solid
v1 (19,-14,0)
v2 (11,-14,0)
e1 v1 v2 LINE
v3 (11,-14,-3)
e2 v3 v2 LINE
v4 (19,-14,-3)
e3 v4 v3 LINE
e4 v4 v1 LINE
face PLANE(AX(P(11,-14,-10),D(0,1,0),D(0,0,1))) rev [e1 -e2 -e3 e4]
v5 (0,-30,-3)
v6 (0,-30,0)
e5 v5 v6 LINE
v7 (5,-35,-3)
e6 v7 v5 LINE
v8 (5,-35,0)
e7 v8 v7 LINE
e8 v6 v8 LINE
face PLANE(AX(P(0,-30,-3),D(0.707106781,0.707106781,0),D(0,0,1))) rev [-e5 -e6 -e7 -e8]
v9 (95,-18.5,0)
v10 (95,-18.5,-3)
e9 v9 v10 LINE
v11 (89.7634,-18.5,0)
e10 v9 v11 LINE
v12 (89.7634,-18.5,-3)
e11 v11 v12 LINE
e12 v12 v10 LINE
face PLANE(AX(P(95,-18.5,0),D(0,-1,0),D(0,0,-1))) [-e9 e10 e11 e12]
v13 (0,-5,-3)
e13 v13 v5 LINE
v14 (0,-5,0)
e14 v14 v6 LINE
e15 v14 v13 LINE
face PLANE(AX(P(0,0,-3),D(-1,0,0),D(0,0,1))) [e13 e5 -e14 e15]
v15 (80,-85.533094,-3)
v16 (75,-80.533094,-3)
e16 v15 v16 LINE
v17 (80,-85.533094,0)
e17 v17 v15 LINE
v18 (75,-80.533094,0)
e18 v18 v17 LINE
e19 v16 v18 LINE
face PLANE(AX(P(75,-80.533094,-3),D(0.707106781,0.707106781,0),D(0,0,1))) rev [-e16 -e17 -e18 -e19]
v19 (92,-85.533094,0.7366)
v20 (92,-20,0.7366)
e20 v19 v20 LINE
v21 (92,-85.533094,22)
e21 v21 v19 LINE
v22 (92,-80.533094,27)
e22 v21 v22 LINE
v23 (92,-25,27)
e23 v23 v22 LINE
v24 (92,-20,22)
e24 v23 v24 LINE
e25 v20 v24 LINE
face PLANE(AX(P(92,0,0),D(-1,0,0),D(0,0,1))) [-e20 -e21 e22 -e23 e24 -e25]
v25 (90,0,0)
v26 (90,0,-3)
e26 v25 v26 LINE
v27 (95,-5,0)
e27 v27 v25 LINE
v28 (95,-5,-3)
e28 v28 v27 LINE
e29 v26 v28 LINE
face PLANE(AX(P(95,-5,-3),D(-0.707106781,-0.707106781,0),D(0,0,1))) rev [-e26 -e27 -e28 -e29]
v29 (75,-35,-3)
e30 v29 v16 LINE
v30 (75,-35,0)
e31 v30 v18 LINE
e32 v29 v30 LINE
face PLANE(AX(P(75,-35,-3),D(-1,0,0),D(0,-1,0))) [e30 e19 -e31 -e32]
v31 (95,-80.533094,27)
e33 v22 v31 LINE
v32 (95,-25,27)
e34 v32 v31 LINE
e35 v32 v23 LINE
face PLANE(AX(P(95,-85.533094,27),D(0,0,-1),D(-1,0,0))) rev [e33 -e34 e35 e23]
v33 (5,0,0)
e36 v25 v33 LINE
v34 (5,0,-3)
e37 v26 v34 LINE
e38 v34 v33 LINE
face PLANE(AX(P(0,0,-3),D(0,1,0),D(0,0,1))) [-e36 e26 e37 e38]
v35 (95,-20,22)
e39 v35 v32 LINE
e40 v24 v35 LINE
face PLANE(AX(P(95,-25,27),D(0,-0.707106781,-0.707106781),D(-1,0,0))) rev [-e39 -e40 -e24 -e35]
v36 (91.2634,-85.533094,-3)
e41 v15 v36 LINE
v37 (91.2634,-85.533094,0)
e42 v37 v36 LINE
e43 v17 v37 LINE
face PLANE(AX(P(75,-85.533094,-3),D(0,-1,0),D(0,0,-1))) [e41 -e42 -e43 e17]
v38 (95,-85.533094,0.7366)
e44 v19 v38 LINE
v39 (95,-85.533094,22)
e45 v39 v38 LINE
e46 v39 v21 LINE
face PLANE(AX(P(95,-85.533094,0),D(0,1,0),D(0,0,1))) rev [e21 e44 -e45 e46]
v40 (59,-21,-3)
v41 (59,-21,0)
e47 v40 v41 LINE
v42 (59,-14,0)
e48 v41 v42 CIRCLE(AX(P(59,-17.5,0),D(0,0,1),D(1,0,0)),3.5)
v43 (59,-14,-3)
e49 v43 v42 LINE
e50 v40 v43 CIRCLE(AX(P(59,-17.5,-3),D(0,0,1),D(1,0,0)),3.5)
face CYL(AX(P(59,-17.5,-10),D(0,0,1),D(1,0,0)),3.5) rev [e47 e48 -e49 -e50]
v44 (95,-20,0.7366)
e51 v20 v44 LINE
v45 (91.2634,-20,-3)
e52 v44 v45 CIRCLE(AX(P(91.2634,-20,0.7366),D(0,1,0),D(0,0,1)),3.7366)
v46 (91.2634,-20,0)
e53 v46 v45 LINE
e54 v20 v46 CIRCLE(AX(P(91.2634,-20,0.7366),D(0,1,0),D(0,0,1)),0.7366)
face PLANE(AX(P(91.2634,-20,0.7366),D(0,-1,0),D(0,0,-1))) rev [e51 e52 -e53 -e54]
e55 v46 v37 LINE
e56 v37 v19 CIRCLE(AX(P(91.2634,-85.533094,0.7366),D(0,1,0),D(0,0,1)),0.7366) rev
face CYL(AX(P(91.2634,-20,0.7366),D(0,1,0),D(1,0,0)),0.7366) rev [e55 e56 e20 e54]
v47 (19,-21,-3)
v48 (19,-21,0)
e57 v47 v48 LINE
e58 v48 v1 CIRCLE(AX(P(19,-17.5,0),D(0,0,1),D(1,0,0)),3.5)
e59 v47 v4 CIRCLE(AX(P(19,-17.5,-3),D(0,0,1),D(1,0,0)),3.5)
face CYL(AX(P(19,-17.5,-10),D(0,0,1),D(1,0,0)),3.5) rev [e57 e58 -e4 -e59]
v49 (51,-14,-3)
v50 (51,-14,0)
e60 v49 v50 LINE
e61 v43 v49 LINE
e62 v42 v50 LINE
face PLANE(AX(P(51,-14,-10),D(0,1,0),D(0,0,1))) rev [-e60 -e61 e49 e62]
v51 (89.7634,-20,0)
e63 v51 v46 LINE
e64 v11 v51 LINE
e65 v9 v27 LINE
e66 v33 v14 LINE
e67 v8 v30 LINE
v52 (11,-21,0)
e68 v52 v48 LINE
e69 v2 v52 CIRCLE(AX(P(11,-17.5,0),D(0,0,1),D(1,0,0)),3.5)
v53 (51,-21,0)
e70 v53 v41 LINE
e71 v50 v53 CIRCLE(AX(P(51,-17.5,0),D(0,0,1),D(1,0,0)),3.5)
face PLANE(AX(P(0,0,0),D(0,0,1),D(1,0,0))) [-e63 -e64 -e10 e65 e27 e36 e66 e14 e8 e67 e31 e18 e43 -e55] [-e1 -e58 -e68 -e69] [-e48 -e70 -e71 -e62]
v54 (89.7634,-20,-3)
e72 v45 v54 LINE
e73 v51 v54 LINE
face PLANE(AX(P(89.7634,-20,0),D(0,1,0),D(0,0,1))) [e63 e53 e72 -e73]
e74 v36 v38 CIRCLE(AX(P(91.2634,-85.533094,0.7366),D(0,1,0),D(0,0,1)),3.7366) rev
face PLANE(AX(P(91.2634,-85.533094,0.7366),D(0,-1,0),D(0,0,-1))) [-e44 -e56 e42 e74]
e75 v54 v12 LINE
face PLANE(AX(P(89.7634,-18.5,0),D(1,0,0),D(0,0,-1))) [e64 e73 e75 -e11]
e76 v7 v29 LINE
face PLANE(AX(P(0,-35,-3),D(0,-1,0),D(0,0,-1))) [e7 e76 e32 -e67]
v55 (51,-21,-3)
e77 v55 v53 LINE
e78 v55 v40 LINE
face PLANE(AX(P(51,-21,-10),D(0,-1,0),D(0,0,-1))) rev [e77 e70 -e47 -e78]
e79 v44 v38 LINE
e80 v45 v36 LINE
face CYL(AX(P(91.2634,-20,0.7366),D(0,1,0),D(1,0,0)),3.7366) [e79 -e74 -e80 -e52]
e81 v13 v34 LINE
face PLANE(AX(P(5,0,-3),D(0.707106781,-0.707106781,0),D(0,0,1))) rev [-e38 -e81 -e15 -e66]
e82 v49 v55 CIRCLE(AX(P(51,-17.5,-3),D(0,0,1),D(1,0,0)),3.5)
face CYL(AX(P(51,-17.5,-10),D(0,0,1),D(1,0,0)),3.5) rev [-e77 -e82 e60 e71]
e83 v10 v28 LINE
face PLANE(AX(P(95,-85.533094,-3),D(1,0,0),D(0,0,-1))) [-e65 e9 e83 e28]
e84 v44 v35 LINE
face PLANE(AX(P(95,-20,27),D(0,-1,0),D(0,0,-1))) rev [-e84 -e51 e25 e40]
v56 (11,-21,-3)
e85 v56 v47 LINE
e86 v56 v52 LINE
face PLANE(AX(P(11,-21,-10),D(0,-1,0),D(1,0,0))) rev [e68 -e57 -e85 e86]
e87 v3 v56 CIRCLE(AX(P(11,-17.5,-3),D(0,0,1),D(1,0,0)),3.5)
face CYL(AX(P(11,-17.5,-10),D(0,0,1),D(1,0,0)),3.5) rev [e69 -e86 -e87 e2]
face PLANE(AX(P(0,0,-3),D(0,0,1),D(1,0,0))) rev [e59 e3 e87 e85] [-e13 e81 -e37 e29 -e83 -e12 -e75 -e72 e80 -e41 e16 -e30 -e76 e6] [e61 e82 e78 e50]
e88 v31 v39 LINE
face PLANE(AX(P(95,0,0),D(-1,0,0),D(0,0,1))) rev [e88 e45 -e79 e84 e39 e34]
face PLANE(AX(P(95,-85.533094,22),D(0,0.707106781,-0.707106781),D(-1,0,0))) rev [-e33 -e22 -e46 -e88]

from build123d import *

# Parameters (mm, degrees)
SM_BASE_FLANGE_1_DEPTH            = 3
SM_EDGE_FLANGE_1_STRIP_W          = 13.4732
SM_EDGE_FLANGE_1_STRIP_H          = 3
SM_EDGE_FLANGE_1_STRIP_CUT_DEPTH  = 65.533094289
SM_EDGE_FLANGE_1_RELIEF_W         = 14.9732
SM_EDGE_FLANGE_1_RELIEF_H         = 1.5
SM_EDGE_FLANGE_1_RELIEF_CUT_DEPTH = 3
SM_EDGE_FLANGE_1_DEPTH            = 65.533094289
CHAMFER_1_SIZE                    = 5
CUT_EXTRUDE_1_DEPTH               = 10


# Sheet-metal steps are written as plain solids
with BuildPart() as part:
    # Sketch 1 → 基体-法兰1 (new body)
    with BuildSketch(Plane.XY):
        Polygon((75, -35), (75, -85.533094289), (95, -85.533094289), (95, 0), (0, 0), (0, -35), align=None)
    extrude(amount=-SM_BASE_FLANGE_1_DEPTH)

    # 边线-法兰1 strip (across the edge) → 边线-法兰1 strip cut (cut)
    with BuildSketch(Plane(origin=(95, -85.533094289, 0), x_dir=(-1, 0, 0), z_dir=(0, 1, 0))):
        with Locations((-3, -1.5)):
            Rectangle(SM_EDGE_FLANGE_1_STRIP_W, SM_EDGE_FLANGE_1_STRIP_H)
    extrude(amount=SM_EDGE_FLANGE_1_STRIP_CUT_DEPTH, mode=Mode.SUBTRACT)

    # 边线-法兰1 relief (on the sheet) → 边线-法兰1 relief cut (cut)
    with BuildSketch(Plane(origin=(91.2634, -85.533094289, 0), x_dir=(-1, 0, 0), z_dir=(0, 0, 1))):
        with Locations((-5.9866, -66.283094289)):
            Rectangle(SM_EDGE_FLANGE_1_RELIEF_W, SM_EDGE_FLANGE_1_RELIEF_H)
    extrude(amount=-SM_EDGE_FLANGE_1_RELIEF_CUT_DEPTH, mode=Mode.SUBTRACT)

    # 边线-法兰1 section (across the edge) → 边线-法兰1 (add)
    with BuildSketch(Plane(origin=(95, -85.533094289, 0), x_dir=(-1, 0, 0), z_dir=(0, 1, 0))):
        with BuildLine():
            Line((0, 0.7366), (0, 27))
            Line((0, 27), (3, 27))
            Line((3, 27), (3, 0.7366))
            ThreePointArc((3, 0.7366), (3.215745145, 0.215745145), (3.7366, 0))
            Line((3.7366, 0), (3.7366, -3))
            ThreePointArc((3.7366, -3), (1.094424801, -1.905575199), (0, 0.7366))
        make_face()
    extrude(amount=SM_EDGE_FLANGE_1_DEPTH)

    # 倒角1
    chamfer_1_edges = [part.edges().sort_by_distance(p)[0] for p in [
        (0, 0, -1.5),
        (95, 0, -1.5),
        (75, -85.533094289, -1.5),
        (0, -35, -1.5),
        (93.5, -85.533094289, 27),
        (93.5, -20, 27),
    ]]
    chamfer(chamfer_1_edges, length=CHAMFER_1_SIZE)

    # 草图10 → 切除-拉伸1 (cut)
    with BuildSketch(Plane.XY):
        with BuildLine():
            Line((11, -14), (19, -14))
            ThreePointArc((19, -14), (22.5, -17.5), (19, -21))
            Line((19, -21), (11, -21))
            ThreePointArc((11, -21), (7.5, -17.5), (11, -14))
        make_face()
        with BuildLine():
            Line((51, -14), (59, -14))
            ThreePointArc((59, -14), (62.5, -17.5), (59, -21))
            Line((59, -21), (51, -21))
            ThreePointArc((51, -21), (47.5, -17.5), (51, -14))
        make_face()
    extrude(amount=-CUT_EXTRUDE_1_DEPTH, mode=Mode.SUBTRACT)


solid = part.part
